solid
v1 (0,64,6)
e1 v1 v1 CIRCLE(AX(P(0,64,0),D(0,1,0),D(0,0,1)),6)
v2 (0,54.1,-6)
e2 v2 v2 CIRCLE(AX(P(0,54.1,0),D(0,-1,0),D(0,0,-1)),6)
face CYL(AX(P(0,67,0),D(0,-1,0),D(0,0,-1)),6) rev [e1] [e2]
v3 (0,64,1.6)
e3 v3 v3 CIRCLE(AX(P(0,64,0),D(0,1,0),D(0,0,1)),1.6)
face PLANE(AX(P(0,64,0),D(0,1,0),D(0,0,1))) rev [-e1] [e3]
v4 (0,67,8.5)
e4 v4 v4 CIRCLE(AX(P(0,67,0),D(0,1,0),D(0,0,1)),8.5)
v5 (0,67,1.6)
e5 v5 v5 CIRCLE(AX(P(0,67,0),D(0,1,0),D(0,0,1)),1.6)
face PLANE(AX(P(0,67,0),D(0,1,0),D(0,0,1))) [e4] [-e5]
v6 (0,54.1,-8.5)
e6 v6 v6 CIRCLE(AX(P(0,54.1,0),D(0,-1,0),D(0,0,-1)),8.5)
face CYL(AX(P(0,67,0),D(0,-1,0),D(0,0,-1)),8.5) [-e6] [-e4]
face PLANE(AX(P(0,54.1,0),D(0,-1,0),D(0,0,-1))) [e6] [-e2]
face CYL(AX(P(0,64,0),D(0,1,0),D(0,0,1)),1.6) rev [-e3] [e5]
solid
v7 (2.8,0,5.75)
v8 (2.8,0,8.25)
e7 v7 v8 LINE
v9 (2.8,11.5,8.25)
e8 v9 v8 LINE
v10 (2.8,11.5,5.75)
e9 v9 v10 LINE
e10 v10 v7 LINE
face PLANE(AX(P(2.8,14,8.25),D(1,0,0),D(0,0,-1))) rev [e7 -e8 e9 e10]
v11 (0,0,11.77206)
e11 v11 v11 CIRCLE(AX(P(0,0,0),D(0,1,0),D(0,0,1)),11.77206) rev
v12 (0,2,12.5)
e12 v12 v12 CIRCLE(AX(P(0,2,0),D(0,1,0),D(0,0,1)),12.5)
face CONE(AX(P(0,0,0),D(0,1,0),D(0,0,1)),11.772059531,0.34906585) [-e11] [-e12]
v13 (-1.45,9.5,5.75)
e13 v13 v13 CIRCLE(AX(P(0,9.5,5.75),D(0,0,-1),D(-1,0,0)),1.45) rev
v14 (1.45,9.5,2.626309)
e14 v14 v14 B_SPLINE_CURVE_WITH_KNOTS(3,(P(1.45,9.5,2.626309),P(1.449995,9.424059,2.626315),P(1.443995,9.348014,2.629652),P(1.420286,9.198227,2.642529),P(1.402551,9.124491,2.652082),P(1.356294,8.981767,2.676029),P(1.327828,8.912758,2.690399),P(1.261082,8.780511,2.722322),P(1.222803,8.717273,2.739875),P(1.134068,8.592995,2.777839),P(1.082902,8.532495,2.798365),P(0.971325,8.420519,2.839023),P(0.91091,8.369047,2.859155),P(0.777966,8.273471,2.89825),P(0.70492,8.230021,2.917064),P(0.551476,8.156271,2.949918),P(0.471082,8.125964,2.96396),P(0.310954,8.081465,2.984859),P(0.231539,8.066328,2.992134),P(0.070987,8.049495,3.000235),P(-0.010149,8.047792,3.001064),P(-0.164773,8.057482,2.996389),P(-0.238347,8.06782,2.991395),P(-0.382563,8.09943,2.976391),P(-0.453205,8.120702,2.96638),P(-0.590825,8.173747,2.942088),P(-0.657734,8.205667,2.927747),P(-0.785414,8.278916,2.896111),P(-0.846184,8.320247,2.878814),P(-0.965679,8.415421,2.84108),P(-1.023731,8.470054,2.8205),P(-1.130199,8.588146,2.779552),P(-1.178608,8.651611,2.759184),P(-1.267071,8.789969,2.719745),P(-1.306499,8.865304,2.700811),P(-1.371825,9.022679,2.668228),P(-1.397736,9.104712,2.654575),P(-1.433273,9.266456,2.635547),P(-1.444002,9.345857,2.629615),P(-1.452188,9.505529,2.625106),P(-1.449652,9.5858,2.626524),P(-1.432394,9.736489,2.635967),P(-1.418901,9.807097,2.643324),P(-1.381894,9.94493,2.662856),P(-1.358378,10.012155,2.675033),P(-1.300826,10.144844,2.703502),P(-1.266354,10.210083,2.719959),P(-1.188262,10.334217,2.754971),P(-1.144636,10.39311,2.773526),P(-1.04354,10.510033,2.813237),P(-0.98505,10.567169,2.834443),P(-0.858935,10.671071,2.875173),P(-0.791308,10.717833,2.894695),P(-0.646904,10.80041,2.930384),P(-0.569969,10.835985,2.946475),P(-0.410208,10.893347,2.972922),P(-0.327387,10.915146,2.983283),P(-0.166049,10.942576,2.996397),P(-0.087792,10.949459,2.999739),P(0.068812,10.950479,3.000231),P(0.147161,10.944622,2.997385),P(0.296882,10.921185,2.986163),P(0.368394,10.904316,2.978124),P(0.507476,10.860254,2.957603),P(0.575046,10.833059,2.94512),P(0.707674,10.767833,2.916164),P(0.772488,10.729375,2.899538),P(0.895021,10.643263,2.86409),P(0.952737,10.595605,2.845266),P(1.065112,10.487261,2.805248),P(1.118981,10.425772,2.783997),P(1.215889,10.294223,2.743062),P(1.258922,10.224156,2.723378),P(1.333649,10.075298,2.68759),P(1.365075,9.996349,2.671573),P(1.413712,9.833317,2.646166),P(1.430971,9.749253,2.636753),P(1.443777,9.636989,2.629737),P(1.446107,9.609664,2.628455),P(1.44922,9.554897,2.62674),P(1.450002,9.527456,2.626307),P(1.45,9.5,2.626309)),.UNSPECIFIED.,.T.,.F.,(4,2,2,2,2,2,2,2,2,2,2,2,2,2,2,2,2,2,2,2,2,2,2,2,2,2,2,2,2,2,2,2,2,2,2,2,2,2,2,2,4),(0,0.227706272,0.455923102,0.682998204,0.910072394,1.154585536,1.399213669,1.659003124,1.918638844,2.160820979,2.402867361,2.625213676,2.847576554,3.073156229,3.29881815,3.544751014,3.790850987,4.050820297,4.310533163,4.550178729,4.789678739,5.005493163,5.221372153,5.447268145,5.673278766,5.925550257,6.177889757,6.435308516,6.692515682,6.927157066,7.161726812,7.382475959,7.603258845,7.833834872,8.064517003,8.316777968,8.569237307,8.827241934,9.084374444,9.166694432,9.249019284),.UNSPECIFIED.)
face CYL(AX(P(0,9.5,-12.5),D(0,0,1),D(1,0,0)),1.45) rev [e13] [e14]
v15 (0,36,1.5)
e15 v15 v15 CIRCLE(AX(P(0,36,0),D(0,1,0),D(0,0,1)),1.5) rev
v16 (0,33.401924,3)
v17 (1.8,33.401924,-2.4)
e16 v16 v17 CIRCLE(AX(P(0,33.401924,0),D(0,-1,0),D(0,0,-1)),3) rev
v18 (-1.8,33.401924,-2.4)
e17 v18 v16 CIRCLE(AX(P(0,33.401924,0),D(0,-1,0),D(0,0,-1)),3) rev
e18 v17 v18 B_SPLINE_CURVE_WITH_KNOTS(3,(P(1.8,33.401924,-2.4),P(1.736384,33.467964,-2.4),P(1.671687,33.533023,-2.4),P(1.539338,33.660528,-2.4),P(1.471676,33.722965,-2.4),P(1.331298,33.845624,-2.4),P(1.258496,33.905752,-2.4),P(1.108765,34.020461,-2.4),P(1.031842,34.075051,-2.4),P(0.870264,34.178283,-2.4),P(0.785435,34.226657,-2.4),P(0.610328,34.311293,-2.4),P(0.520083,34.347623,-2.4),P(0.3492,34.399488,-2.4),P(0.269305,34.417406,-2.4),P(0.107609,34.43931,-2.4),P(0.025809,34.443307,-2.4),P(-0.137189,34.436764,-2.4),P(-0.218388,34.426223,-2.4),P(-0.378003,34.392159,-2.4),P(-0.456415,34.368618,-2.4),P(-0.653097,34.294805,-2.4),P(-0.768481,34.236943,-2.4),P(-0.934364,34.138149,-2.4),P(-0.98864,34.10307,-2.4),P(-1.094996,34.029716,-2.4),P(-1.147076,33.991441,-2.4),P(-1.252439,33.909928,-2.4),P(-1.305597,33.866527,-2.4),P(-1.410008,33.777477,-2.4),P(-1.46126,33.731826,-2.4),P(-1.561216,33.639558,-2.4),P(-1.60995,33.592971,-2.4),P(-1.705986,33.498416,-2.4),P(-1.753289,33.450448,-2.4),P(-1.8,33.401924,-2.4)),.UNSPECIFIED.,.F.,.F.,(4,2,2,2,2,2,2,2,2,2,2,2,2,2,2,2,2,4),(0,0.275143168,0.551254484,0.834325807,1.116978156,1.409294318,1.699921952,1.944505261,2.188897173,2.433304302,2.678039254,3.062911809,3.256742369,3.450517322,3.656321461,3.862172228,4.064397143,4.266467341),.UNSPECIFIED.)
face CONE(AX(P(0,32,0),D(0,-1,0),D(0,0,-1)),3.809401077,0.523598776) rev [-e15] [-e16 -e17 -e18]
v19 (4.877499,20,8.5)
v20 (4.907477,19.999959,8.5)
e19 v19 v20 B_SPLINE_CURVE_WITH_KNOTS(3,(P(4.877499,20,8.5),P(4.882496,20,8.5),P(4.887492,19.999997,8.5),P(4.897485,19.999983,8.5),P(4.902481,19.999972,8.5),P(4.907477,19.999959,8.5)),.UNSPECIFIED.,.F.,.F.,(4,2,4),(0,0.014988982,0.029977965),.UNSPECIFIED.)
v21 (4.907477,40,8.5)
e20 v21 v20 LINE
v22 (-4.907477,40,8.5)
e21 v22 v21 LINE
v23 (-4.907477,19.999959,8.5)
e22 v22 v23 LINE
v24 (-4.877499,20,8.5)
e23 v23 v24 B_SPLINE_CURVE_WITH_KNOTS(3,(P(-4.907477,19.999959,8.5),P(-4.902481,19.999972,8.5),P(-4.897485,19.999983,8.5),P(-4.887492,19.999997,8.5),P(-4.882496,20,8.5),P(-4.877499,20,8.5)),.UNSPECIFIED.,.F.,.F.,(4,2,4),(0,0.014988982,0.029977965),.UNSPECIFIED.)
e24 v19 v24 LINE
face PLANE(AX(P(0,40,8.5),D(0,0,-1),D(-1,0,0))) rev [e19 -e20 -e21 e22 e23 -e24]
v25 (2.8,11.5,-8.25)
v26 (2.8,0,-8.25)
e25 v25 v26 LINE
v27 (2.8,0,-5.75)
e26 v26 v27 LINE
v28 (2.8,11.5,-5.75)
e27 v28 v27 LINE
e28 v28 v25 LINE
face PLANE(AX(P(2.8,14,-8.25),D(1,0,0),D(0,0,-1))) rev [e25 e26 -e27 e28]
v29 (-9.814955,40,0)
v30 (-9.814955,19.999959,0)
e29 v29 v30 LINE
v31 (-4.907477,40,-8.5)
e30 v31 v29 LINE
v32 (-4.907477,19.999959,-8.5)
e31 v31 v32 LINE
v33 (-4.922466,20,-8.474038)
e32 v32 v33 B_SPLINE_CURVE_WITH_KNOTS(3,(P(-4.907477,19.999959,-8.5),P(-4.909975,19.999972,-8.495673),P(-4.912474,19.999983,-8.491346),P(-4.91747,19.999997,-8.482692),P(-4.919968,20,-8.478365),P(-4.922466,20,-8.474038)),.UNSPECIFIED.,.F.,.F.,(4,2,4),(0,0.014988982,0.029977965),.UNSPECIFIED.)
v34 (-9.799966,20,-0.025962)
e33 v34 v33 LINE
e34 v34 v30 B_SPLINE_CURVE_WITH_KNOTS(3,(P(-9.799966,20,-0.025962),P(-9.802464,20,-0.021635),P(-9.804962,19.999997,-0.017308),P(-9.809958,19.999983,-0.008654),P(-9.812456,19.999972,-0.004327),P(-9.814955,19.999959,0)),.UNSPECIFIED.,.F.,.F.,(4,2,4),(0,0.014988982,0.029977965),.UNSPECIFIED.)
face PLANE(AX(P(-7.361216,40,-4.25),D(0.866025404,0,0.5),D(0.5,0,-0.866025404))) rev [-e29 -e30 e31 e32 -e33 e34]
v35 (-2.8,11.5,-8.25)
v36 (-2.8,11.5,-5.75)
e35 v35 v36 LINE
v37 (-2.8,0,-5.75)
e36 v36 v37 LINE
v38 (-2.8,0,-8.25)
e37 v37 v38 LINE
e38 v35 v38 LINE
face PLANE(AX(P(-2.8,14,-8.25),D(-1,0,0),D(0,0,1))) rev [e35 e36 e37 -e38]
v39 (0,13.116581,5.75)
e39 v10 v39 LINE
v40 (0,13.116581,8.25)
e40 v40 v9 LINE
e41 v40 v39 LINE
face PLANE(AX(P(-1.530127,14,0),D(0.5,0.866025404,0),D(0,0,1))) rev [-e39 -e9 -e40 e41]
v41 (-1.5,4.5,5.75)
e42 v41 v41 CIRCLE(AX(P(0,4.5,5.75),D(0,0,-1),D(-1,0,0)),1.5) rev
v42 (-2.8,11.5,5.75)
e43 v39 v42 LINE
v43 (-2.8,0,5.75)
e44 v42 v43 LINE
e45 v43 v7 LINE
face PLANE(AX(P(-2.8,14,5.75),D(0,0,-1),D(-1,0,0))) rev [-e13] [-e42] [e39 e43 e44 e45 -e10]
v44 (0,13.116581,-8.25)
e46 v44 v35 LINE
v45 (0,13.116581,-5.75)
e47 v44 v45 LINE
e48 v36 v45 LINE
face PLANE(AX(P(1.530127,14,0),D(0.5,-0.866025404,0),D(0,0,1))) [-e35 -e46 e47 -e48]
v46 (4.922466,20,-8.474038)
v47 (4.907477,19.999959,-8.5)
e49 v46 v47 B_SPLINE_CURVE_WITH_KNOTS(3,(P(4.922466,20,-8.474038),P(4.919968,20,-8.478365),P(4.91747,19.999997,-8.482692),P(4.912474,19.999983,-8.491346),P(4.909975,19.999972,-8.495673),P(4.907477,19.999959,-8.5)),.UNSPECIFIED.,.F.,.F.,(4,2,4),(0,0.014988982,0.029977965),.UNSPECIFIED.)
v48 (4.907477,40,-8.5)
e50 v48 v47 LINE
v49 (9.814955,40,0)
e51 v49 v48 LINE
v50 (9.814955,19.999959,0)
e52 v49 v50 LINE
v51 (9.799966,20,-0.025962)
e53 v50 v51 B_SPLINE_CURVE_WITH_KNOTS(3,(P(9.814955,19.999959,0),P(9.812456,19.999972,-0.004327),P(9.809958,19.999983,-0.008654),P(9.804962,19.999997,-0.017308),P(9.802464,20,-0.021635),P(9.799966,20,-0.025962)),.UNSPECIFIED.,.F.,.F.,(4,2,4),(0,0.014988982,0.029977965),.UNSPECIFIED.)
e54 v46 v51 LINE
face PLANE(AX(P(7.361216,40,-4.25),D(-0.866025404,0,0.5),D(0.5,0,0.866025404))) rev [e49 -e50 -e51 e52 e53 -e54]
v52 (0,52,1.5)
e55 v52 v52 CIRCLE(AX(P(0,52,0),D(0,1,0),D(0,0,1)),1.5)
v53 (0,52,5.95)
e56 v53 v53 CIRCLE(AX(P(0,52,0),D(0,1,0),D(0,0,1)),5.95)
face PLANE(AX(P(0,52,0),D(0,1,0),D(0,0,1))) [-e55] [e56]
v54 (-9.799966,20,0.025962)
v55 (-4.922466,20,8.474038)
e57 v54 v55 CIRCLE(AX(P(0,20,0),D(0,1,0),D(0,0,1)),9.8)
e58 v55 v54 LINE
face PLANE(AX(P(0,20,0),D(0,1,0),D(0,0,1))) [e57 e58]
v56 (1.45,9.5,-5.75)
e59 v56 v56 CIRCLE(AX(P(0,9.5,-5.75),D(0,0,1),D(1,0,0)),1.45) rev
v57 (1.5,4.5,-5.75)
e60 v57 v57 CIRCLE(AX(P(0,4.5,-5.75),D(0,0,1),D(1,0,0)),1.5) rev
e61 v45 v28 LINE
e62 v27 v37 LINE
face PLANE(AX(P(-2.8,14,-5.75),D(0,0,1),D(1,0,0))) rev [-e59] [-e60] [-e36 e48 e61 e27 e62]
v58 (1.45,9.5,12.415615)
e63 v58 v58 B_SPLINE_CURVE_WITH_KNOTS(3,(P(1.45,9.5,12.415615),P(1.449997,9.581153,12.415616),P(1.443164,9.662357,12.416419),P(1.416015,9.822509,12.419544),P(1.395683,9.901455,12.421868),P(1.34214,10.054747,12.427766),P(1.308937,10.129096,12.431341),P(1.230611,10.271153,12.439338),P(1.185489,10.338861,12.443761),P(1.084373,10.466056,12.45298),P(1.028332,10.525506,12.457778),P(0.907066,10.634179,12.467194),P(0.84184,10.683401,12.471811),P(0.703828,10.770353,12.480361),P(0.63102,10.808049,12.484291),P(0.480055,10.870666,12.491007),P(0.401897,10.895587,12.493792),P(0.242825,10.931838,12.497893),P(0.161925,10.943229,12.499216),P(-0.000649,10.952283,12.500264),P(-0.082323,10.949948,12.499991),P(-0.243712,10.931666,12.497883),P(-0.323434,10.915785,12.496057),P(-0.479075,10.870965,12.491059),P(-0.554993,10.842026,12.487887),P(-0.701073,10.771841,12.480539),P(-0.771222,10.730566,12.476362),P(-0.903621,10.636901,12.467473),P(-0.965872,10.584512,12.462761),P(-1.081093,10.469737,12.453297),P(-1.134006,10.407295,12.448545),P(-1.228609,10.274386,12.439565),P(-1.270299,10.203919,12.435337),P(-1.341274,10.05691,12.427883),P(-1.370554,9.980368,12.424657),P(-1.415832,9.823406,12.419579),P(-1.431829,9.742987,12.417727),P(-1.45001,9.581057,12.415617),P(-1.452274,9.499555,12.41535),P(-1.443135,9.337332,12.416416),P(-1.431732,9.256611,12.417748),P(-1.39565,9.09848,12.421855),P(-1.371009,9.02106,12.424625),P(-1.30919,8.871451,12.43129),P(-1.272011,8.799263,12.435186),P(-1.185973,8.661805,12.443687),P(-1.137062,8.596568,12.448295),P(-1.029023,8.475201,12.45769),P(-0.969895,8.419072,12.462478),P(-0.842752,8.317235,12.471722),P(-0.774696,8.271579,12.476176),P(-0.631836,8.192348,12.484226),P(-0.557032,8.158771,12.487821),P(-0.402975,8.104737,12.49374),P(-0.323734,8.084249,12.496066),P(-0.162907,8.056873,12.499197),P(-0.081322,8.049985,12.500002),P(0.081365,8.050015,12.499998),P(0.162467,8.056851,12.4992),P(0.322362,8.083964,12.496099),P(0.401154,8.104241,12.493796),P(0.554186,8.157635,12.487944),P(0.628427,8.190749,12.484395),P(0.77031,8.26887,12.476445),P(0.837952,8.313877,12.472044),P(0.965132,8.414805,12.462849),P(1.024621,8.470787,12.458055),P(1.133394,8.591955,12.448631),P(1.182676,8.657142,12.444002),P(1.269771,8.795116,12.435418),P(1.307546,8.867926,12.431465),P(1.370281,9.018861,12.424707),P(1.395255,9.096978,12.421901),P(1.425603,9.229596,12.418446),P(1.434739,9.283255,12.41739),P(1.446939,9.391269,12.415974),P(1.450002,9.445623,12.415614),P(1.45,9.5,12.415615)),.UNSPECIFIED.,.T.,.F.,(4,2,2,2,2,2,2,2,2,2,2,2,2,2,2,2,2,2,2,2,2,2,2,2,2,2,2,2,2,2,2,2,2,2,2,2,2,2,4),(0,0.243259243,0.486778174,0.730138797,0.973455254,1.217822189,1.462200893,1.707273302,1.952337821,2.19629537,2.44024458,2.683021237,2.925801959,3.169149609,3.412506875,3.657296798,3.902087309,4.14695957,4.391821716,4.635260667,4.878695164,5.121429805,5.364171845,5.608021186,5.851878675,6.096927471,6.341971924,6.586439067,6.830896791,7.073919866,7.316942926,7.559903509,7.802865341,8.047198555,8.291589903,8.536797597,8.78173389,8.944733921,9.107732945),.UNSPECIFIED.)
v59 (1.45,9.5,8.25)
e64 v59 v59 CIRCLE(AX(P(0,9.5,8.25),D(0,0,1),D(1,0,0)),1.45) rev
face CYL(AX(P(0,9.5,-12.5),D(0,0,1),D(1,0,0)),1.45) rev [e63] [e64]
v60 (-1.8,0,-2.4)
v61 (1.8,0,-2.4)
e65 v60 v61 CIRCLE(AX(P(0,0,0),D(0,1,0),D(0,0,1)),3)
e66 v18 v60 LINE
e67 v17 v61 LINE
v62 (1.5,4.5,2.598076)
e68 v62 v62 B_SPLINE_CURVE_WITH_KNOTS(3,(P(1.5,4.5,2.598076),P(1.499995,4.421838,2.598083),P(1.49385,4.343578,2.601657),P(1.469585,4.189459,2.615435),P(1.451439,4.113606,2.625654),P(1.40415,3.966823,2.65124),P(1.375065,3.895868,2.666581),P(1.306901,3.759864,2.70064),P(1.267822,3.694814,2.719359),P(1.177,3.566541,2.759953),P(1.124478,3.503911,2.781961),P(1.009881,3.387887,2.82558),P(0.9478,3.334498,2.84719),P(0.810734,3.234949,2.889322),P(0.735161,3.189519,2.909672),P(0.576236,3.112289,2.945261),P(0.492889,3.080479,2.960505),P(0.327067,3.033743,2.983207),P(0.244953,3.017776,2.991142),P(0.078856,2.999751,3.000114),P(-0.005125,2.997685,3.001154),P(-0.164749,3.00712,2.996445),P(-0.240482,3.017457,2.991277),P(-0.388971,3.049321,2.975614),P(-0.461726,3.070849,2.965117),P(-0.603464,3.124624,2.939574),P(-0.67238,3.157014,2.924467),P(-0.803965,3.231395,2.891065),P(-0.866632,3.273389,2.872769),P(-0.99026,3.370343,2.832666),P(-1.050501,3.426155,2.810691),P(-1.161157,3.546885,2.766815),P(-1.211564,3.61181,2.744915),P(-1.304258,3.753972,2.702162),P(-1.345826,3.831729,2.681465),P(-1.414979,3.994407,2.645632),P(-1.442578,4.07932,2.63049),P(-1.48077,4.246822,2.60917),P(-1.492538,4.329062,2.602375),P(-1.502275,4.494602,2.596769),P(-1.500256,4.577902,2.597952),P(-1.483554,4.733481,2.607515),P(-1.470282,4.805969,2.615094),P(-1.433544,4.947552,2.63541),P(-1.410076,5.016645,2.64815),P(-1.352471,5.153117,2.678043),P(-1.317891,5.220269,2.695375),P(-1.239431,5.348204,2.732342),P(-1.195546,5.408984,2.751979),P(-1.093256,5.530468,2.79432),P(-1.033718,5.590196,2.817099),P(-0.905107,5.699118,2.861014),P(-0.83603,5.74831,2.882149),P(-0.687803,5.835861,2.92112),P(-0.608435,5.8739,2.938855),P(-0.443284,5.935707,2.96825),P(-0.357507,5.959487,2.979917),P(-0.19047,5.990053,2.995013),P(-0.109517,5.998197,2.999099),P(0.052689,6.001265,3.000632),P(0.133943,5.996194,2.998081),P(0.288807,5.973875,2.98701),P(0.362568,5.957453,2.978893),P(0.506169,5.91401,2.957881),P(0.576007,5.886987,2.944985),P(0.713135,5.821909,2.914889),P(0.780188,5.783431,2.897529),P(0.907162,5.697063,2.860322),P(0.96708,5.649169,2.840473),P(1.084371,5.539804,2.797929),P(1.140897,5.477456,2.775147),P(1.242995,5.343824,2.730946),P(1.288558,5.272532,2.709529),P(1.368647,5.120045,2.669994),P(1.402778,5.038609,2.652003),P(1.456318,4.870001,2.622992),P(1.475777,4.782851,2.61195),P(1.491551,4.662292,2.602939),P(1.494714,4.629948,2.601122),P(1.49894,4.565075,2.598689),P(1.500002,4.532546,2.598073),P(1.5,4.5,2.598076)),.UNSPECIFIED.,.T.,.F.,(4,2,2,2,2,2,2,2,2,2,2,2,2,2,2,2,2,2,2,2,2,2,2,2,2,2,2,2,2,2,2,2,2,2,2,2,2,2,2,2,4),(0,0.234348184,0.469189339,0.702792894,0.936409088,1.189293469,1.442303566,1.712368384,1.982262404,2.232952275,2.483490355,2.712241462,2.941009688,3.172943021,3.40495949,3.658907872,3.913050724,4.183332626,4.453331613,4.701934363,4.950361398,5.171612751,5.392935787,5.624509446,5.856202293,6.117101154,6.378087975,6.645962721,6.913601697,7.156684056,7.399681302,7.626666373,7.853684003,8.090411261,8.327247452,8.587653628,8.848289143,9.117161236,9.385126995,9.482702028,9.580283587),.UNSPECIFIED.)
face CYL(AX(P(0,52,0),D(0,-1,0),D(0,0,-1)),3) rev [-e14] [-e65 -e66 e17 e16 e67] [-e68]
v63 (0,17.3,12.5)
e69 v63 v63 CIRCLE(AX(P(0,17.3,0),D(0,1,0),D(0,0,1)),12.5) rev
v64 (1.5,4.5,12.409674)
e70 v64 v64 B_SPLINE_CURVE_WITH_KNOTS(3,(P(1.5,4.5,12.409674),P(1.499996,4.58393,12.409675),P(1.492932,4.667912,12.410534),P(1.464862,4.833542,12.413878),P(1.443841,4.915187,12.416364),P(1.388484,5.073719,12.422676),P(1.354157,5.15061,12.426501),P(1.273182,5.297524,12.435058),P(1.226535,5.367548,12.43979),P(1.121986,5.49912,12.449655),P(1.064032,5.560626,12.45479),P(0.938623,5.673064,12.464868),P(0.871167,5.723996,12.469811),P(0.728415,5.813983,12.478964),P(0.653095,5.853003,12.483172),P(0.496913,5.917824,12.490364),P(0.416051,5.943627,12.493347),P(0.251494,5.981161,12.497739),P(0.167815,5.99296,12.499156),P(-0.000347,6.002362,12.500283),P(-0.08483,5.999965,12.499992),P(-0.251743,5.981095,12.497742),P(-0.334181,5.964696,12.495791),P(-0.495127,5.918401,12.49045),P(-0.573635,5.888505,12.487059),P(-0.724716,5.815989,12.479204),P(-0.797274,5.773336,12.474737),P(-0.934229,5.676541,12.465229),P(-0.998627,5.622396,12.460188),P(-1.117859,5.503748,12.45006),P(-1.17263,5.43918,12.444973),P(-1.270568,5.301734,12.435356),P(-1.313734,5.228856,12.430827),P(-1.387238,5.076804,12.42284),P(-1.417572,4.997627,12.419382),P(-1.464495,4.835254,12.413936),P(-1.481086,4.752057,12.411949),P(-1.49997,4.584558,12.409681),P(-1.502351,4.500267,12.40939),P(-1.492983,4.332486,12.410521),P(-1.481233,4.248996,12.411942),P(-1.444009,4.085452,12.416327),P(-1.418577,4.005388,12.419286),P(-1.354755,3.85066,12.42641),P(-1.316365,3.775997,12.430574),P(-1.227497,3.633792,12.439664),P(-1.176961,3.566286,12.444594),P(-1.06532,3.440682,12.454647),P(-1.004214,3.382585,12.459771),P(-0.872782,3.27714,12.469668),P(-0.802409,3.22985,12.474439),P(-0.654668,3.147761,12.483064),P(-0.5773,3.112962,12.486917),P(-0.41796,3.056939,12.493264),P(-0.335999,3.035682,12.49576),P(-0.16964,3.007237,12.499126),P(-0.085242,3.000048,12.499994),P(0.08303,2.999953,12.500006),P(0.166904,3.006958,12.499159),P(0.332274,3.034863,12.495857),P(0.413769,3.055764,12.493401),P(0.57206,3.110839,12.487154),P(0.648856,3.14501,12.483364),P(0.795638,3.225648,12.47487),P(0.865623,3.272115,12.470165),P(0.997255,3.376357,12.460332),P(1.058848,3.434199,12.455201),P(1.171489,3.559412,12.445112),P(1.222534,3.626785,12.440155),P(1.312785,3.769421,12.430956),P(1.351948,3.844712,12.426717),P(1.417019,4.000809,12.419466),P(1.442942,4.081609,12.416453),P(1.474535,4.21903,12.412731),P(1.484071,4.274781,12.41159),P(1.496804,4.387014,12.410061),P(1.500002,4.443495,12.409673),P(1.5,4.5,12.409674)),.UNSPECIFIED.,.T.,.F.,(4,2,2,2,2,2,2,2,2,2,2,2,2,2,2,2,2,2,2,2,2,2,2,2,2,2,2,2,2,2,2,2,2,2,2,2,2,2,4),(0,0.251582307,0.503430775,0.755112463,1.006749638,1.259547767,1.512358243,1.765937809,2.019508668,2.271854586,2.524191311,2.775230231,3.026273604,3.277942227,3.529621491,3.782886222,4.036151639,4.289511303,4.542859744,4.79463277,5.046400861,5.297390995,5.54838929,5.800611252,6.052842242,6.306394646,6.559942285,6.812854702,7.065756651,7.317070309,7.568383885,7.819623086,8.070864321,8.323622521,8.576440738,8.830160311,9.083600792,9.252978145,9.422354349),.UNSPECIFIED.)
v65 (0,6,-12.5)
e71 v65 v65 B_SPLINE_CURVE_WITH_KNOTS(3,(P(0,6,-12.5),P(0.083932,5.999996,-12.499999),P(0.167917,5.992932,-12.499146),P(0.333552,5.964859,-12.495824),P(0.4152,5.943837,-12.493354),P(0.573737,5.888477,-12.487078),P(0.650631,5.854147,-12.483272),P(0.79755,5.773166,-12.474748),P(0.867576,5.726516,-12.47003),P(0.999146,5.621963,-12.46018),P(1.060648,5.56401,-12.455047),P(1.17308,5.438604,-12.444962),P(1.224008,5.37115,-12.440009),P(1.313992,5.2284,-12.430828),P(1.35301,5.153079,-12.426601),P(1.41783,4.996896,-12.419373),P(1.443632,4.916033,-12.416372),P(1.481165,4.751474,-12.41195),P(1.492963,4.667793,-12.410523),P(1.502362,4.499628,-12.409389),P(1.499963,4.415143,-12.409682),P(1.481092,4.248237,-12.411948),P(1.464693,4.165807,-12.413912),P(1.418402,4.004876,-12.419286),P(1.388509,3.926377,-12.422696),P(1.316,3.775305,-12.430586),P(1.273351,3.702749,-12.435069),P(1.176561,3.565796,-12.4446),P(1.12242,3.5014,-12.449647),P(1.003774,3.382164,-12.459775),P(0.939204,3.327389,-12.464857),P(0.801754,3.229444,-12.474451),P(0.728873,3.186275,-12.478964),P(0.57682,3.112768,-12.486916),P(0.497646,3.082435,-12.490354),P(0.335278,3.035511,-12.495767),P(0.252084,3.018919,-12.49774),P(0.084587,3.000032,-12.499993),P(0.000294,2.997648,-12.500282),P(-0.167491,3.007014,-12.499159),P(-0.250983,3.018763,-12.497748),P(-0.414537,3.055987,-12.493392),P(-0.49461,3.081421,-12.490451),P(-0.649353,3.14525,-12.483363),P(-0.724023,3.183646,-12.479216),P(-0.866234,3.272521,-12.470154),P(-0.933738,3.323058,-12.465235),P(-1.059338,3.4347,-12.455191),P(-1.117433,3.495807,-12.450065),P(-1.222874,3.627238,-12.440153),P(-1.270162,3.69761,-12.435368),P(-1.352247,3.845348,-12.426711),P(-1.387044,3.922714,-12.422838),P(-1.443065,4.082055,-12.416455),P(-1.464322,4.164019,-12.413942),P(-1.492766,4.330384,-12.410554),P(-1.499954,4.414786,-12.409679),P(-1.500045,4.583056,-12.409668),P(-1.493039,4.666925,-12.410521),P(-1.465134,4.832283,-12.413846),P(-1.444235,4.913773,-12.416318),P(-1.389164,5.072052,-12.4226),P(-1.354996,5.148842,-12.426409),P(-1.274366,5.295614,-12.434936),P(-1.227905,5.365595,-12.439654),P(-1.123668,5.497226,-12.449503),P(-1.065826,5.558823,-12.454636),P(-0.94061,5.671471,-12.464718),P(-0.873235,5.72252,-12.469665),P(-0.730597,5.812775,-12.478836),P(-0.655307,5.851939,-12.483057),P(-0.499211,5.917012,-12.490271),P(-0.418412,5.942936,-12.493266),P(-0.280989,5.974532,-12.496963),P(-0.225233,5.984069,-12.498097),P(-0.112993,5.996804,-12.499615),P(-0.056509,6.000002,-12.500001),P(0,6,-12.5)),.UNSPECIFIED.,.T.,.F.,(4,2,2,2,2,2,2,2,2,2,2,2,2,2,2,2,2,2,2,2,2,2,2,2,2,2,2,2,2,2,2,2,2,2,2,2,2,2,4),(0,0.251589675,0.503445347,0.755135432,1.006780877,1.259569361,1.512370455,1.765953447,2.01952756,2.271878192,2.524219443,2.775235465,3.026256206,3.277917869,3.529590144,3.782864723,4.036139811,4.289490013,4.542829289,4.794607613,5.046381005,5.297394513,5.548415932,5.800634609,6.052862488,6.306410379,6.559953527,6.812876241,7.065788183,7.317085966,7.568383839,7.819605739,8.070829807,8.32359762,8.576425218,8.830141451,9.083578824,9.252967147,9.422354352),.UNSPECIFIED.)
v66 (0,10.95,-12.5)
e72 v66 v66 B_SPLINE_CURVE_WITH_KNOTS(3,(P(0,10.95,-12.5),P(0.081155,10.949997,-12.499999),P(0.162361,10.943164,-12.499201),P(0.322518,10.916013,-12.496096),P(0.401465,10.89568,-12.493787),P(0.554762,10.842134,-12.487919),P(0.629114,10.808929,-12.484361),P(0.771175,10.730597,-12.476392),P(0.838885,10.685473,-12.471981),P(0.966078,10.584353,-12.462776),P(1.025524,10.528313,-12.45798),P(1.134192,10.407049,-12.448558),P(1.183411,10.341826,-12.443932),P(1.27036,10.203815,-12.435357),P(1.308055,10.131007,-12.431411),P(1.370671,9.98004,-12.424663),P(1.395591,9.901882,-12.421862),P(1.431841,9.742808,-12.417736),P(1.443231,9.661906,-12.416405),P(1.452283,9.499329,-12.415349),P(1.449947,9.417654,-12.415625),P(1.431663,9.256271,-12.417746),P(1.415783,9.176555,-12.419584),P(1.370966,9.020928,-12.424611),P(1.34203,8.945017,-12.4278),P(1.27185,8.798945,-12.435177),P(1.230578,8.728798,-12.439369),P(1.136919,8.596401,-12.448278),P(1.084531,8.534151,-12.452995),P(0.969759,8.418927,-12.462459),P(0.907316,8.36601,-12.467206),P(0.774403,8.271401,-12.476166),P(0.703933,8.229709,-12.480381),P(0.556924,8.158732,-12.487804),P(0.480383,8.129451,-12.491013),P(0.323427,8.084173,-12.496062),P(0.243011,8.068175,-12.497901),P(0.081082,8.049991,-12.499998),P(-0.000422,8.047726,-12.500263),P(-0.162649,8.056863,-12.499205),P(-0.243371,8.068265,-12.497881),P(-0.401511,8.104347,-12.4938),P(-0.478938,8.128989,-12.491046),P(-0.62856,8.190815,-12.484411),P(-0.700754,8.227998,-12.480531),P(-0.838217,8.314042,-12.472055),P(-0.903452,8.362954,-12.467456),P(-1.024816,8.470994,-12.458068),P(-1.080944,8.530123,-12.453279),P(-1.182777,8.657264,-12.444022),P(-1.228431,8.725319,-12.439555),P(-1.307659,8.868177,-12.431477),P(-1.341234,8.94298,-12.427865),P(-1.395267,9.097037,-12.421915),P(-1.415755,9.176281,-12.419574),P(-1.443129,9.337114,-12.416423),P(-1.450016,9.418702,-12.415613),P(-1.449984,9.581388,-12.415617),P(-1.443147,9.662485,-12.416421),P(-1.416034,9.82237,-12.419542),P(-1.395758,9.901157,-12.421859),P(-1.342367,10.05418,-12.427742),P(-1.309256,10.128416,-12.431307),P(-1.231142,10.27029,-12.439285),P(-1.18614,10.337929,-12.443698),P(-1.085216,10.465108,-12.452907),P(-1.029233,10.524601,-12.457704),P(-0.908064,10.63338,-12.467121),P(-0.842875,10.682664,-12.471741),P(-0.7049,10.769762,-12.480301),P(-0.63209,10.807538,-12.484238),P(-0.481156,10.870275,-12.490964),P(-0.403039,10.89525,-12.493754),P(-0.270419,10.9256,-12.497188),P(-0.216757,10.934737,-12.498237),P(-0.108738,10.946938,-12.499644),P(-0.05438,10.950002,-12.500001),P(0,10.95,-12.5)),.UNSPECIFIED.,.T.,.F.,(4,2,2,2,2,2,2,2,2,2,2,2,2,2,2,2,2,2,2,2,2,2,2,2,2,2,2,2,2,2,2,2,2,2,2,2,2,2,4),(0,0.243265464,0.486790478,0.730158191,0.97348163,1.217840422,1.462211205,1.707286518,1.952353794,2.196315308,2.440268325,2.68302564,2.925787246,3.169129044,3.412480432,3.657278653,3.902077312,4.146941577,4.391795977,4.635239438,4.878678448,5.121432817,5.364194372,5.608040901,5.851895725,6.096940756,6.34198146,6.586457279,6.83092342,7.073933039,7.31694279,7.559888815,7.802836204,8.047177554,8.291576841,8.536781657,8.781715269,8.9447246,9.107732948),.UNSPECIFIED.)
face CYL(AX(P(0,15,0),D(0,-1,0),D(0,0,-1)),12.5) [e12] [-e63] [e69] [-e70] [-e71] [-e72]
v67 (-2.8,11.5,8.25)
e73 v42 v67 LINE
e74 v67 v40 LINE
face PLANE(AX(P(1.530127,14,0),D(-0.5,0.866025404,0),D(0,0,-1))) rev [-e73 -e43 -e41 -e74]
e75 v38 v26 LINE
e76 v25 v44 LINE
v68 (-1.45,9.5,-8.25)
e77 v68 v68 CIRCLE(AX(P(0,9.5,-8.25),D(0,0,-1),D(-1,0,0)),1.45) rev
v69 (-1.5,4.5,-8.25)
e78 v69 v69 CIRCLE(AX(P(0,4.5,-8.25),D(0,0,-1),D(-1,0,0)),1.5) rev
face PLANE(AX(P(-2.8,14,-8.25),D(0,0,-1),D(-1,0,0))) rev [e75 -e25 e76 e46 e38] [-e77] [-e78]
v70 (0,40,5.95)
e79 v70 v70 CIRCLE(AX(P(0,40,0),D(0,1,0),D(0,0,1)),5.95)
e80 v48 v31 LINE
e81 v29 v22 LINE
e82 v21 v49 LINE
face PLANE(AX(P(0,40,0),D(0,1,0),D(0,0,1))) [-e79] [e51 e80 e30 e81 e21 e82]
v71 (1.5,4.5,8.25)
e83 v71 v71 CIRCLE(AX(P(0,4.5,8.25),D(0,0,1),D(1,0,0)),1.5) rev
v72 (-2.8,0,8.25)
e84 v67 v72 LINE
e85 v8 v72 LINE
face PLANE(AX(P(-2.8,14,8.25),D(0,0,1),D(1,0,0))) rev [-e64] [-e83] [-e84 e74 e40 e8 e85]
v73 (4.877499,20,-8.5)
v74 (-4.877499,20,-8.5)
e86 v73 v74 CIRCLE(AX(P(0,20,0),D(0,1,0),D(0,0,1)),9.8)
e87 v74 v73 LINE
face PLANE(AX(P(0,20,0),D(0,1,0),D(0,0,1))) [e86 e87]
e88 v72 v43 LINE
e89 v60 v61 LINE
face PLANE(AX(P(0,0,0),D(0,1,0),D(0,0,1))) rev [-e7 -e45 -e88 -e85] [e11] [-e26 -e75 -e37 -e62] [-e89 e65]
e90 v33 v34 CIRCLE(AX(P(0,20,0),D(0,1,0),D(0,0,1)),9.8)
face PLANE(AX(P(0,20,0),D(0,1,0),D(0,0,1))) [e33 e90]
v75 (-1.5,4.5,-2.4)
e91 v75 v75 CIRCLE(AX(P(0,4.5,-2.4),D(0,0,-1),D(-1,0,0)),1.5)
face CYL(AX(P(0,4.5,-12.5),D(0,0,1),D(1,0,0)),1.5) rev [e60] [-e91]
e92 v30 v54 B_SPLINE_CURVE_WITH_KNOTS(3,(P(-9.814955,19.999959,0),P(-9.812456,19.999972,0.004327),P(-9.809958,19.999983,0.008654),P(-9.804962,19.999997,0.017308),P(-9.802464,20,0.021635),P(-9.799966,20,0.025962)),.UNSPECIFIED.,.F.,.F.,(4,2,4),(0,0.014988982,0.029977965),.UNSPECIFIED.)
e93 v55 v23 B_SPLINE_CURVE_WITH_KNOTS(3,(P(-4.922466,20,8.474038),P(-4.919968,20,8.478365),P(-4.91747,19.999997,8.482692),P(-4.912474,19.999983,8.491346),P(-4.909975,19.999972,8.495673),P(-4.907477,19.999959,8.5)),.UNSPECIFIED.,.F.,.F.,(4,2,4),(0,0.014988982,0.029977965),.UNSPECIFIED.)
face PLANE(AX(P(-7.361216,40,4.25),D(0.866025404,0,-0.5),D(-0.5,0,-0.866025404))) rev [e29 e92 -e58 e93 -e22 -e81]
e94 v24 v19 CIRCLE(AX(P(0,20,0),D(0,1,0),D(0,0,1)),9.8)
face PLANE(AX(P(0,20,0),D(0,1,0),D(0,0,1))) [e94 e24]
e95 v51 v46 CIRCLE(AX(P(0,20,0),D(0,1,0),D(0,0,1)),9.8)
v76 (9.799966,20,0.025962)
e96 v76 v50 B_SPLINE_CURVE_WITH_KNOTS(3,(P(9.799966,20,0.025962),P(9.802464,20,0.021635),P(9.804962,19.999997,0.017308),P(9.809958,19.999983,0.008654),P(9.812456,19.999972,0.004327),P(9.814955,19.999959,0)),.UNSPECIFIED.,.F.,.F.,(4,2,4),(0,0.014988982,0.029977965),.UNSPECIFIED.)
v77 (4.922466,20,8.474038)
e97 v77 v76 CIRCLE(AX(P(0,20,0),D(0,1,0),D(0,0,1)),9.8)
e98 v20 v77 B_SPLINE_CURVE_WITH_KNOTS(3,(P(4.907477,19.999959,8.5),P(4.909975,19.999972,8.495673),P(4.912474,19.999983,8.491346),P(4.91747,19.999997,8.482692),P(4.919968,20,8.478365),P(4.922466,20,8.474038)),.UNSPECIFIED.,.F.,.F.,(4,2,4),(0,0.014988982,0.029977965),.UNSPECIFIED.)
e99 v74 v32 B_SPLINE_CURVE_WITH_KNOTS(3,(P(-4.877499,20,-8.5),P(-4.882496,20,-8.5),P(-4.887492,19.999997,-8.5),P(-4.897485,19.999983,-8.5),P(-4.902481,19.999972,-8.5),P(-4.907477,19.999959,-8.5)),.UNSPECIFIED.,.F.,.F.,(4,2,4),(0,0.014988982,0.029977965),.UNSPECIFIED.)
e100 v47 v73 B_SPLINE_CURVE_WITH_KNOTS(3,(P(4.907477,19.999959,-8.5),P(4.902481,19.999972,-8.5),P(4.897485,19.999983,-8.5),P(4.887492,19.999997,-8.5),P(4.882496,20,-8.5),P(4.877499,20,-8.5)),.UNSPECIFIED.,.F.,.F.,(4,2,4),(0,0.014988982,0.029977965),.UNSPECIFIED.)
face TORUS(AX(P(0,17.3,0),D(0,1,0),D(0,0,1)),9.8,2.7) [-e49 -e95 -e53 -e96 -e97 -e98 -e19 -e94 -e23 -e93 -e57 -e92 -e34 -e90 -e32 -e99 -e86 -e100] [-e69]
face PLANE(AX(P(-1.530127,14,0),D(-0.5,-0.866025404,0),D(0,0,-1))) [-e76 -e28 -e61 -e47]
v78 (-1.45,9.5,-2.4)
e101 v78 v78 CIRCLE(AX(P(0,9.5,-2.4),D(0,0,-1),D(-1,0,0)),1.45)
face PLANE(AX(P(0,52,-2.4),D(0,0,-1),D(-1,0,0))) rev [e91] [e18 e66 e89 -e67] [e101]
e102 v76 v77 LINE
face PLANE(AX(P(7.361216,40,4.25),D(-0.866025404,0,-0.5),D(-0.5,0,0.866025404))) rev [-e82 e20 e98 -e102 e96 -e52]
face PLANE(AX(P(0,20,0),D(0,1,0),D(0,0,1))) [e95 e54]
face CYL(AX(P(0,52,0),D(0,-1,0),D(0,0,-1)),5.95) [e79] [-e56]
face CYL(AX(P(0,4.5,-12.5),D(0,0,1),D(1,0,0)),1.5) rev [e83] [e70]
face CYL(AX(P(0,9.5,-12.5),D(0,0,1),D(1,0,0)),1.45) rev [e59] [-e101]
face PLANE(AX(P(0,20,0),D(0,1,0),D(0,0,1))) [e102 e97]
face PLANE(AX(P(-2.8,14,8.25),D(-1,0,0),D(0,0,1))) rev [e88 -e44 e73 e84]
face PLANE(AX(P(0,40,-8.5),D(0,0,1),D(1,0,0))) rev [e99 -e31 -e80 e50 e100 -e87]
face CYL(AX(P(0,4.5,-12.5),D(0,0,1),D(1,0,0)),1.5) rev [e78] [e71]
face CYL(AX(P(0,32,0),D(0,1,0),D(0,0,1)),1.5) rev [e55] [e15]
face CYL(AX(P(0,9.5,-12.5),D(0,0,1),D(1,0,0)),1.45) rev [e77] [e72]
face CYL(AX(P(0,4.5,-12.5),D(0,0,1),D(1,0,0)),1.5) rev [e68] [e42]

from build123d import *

# Parameters (mm, degrees)
SKETCH1_R               = 5.95
BOSS_EXTRUDE1_DEPTH     = 40
SKETCH1_2_R             = 5.95
BOSS_EXTRUDE2_DEPTH     = 52
SKETCH2_R               = 12.5
BOSS_EXTRUDE3_DEPTH     = 15
CUT_EXTRUDE1_DEPTH      = 55.922672914
CUT_EXTRUDE1_DEPTH_BACK = 55.922672914
SKETCH3_R               = 1.45
SKETCH3_R_2             = 1.5
SKETCH5_R               = 12.5
BOSS_EXTRUDE4_DEPTH     = 5
SKETCH7_R               = 8.5
SKETCH7_R_2             = 6
BOSS_EXTRUDE5_DEPTH     = 15
SKETCH8_R               = 6
SKETCH8_R_2             = 1.6
BOSS_EXTRUDE6_DEPTH     = 3
SKETCH9_R               = 8.5
CUT_EXTRUDE4_DEPTH      = 2.1
BOSS_EXTRUDE7_START     = -20
SKETCH6_R               = 3
SKETCH6_R_2             = 1.5
BOSS_EXTRUDE7_DEPTH     = 20
CHAMFER1_SIZE           = 2.309401077
CHAMFER1_SIZE_2         = 4
FILLET1_R               = 2.7
CHAMFER2_SIZE           = 2
CHAMFER2_SIZE2          = 0.727940469
SKETCH10_W              = 5.6
SKETCH10_H              = 2.5
CUT_EXTRUDE5_DEPTH      = 14
CHAMFER3_SIZE           = 2.5
CHAMFER3_SIZE_2         = 4.330127019


with BuildPart() as part:
    # Sketch1 → Boss-Extrude1 (new body)
    with BuildSketch(Plane(origin=(0, 0, 0), x_dir=(1, 0, 0), z_dir=(0, 1, 0))):
        Polygon((-4.907477288, -8.5), (4.907477288, -8.5), (9.814954576, 0), (4.907477288, 8.5), (-4.907477288, 8.5), (-9.814954576, 0), align=None)
        with Locations(Location((0, 0, 0), (0, 0, 270))):
            Circle(SKETCH1_R, mode=Mode.SUBTRACT)
    extrude(amount=BOSS_EXTRUDE1_DEPTH)

    # Sketch1<2> → Boss-Extrude2 (add)
    with BuildSketch(Plane(origin=(0, 0, 0), x_dir=(1, 0, 0), z_dir=(0, 1, 0))):
        with Locations(Location((0, 0, 0), (0, 0, 270))):
            Circle(SKETCH1_2_R)
        with BuildLine():
            Line((-1.8, 2.4), (1.8, 2.4))
            ThreePointArc((1.8, 2.4), (0, -3), (-1.8, 2.4))
        make_face(mode=Mode.SUBTRACT)
    extrude(amount=BOSS_EXTRUDE2_DEPTH)

    # Sketch2 → Boss-Extrude3 (add)
    with BuildSketch(Plane.XZ):
        with Locations(Location((0, 0, 0), (0, 0, 270))):
            Circle(SKETCH2_R)
        Polygon((4.907477288, 8.5), (-4.907477288, 8.5), (-9.814954576, 0), (-4.907477288, -8.5), (4.907477288, -8.5), (9.814954576, 0), align=None, mode=Mode.SUBTRACT)
    extrude(amount=-BOSS_EXTRUDE3_DEPTH)

    # Sketch3 → Cut-Extrude1 (cut, two sides: drawn at the far end of the back side and taken through both)
    with BuildSketch(Plane.XY.offset(-CUT_EXTRUDE1_DEPTH_BACK)):
        with Locations((0, 9.5)):
            Circle(SKETCH3_R)
        with Locations((0, 4.5)):
            Circle(SKETCH3_R_2)
    extrude(amount=CUT_EXTRUDE1_DEPTH + CUT_EXTRUDE1_DEPTH_BACK, mode=Mode.SUBTRACT)

    # Sketch5 → Boss-Extrude4 (add)
    with BuildSketch(Plane(origin=(0, 15, 0), x_dir=(1, 0, 0), z_dir=(0, 1, 0))):
        with Locations(Location((0, 0, 0), (0, 0, 90))):
            Circle(SKETCH5_R)
        Polygon((9.814954576, 0), (4.907477288, -8.5), (-4.907477288, -8.5), (-9.814954576, 0), (-4.907477288, 8.5), (4.907477288, 8.5), align=None, mode=Mode.SUBTRACT)
    extrude(amount=BOSS_EXTRUDE4_DEPTH)

    # Sketch6 → Boss-Extrude7 (add)
    with BuildSketch(Plane(origin=(0, 52, 0), x_dir=(1, 0, 0), z_dir=(0, 1, 0)).offset(BOSS_EXTRUDE7_START)):
        Circle(SKETCH6_R)
        with Locations(Location((0, 0, 0), (0, 0, 270))):
            Circle(SKETCH6_R_2, mode=Mode.SUBTRACT)
    extrude(amount=BOSS_EXTRUDE7_DEPTH)

    # Chamfer1
    # the kernel refuses this chamfer: 4, 2.309401077 mm, written as the material it takes off along each edge
    with BuildSketch(Plane(origin=(0, 32, 0), x_dir=(0, 0, 1), z_dir=(-1, 0, 0))) as chamfer1_piece_1_section:
        Polygon((1.5 + CHAMFER1_SIZE, 0), (1.5, CHAMFER1_SIZE_2), (1.5, 0), align=None)
    chamfer1_piece_1 = revolve(axis=Axis((0, 32, 0), (0, 1, 0)), mode=Mode.PRIVATE)
    chamfer1_piece_1 = chamfer1_piece_1 & Plane(origin=(0, 34.751058085, 0), x_dir=(0.6000000000000008, 0, -0.7999999999999994), z_dir=(0, -1, 0)) * Cylinder(3, 16, mode=Mode.PRIVATE)
    chamfer1_piece_1 = split(chamfer1_piece_1, bisect_by=Plane(origin=(0, 34.751058085, -2.4), z_dir=(0, 0, 1)), keep=Keep.TOP, mode=Mode.PRIVATE)
    add(chamfer1_piece_1, mode=Mode.SUBTRACT)

    # Fillet1
    # the kernel refuses this fillet: 2.7 mm, written as the material it takes off along each edge
    with BuildSketch(Plane(origin=(0, 20, 0), x_dir=(0, 0, -1), z_dir=(1, 0, 0))) as fillet1_piece_1_section:
        with BuildLine():
            CenterArc((12.5 - FILLET1_R, -FILLET1_R), FILLET1_R, 0, 90)
            Line((12.5, -FILLET1_R), (12.5, 0))
            Line((12.5, 0), (12.5 - FILLET1_R, 0))
        make_face()
    fillet1_piece_1 = revolve(axis=Axis((0, 20, 0), (0, 1, 0)), mode=Mode.PRIVATE)
    fillet1_piece_1 = split(fillet1_piece_1, bisect_by=Plane(origin=(1.041e-06, 19.432642302, -8.5), z_dir=(0, 0, -1)), keep=Keep.TOP, mode=Mode.PRIVATE)
    add(fillet1_piece_1, mode=Mode.SUBTRACT)
    with BuildSketch(Plane(origin=(0, 20, 0), x_dir=(0, 0, -1), z_dir=(1, 0, 0))) as fillet1_piece_2_section:
        with BuildLine():
            CenterArc((12.5 - FILLET1_R, -FILLET1_R), FILLET1_R, 0, 90)
            Line((12.5, -FILLET1_R), (12.5, 0))
            Line((12.5, 0), (12.5 - FILLET1_R, 0))
        make_face()
    fillet1_piece_2 = revolve(axis=Axis((0, 20, 0), (0, 1, 0)), mode=Mode.PRIVATE)
    fillet1_piece_2 = split(fillet1_piece_2, bisect_by=Plane(origin=(-7.361214724, 19.432641737, -4.250002093), z_dir=(-0.8660254037844416, 0, -0.49999999999999484)), keep=Keep.TOP, mode=Mode.PRIVATE)
    add(fillet1_piece_2, mode=Mode.SUBTRACT)
    with BuildSketch(Plane(origin=(0, 20, 0), x_dir=(0, 0, -1), z_dir=(1, 0, 0))) as fillet1_piece_3_section:
        with BuildLine():
            CenterArc((12.5 - FILLET1_R, -FILLET1_R), FILLET1_R, 0, 90)
            Line((12.5, -FILLET1_R), (12.5, 0))
            Line((12.5, 0), (12.5 - FILLET1_R, 0))
        make_face()
    fillet1_piece_3 = revolve(axis=Axis((0, 20, 0), (0, 1, 0)), mode=Mode.PRIVATE)
    fillet1_piece_3 = split(fillet1_piece_3, bisect_by=Plane(origin=(7.361217141, 19.432641737, -4.249997907), z_dir=(0.8660254037844382, 0, -0.5000000000000011)), keep=Keep.TOP, mode=Mode.PRIVATE)
    add(fillet1_piece_3, mode=Mode.SUBTRACT)
    with BuildSketch(Plane(origin=(0, 20, 0), x_dir=(0, 0, -1), z_dir=(1, 0, 0))) as fillet1_piece_4_section:
        with BuildLine():
            CenterArc((12.5 - FILLET1_R, -FILLET1_R), FILLET1_R, 0, 90)
            Line((12.5, -FILLET1_R), (12.5, 0))
            Line((12.5, 0), (12.5 - FILLET1_R, 0))
        make_face()
    fillet1_piece_4 = revolve(axis=Axis((0, 20, 0), (0, 1, 0)), mode=Mode.PRIVATE)
    fillet1_piece_4 = split(fillet1_piece_4, bisect_by=Plane(origin=(-7.361217141, 19.432641737, 4.249997907), z_dir=(-0.8660254037844347, 0, 0.500000000000007)), keep=Keep.TOP, mode=Mode.PRIVATE)
    add(fillet1_piece_4, mode=Mode.SUBTRACT)
    with BuildSketch(Plane(origin=(0, 20, 0), x_dir=(0, 0, -1), z_dir=(1, 0, 0))) as fillet1_piece_5_section:
        with BuildLine():
            CenterArc((12.5 - FILLET1_R, -FILLET1_R), FILLET1_R, 0, 90)
            Line((12.5, -FILLET1_R), (12.5, 0))
            Line((12.5, 0), (12.5 - FILLET1_R, 0))
        make_face()
    fillet1_piece_5 = revolve(axis=Axis((0, 20, 0), (0, 1, 0)), mode=Mode.PRIVATE)
    fillet1_piece_5 = split(fillet1_piece_5, bisect_by=Plane(origin=(7.361214724, 19.432641737, 4.250002093), z_dir=(0.8660254037844416, 0, 0.49999999999999495)), keep=Keep.TOP, mode=Mode.PRIVATE)
    add(fillet1_piece_5, mode=Mode.SUBTRACT)
    with BuildSketch(Plane(origin=(0, 20, 0), x_dir=(0, 0, -1), z_dir=(1, 0, 0))) as fillet1_piece_6_section:
        with BuildLine():
            CenterArc((12.5 - FILLET1_R, -FILLET1_R), FILLET1_R, 0, 90)
            Line((12.5, -FILLET1_R), (12.5, 0))
            Line((12.5, 0), (12.5 - FILLET1_R, 0))
        make_face()
    fillet1_piece_6 = revolve(axis=Axis((0, 20, 0), (0, 1, 0)), mode=Mode.PRIVATE)
    fillet1_piece_6 = split(fillet1_piece_6, bisect_by=Plane(origin=(-2.417e-06, 19.432641737, 8.5), z_dir=(0, 0, 1)), keep=Keep.TOP, mode=Mode.PRIVATE)
    add(fillet1_piece_6, mode=Mode.SUBTRACT)

    # Chamfer2
    chamfer2_edges = [part.edges().sort_by_distance(p)[0] for p in [
        (0, 0, 12.5),
    ]]
    chamfer2_side = [part.faces().sort_by_distance(p)[0] for p in [
        (0, 7.5, 12.5),
    ]]
    chamfer(chamfer2_edges, length=CHAMFER2_SIZE, length2=CHAMFER2_SIZE2, reference=chamfer2_side[0])

    # Sketch10 → Cut-Extrude5 (cut)
    with BuildSketch(Plane.XZ):
        with Locations((0, -7)):
            Rectangle(SKETCH10_W, SKETCH10_H)
        with Locations((0, 7)):
            Rectangle(SKETCH10_W, SKETCH10_H)
    extrude(amount=-CUT_EXTRUDE5_DEPTH, mode=Mode.SUBTRACT)

    # Chamfer3
    # the kernel refuses this chamfer: 4.330127019, 2.5 mm, written as the material it adds along each edge
    with BuildSketch(Plane(origin=(-2.8, 14, -5.75), x_dir=(-0.05789386240267132, -0.9983227437537926, 0), z_dir=(0, 0, -1)), Plane(origin=(2.8, 14, -8.25), x_dir=(0.05789386240267132, -0.9983227437537926, 0), z_dir=(0, 0, 1)), Plane(origin=(2.8, 14, 5.75), x_dir=(0.05789386240267132, -0.9983227437537926, 0), z_dir=(0, 0, 1)), Plane(origin=(-2.8, 14, 8.25), x_dir=(-0.05789386240267132, -0.9983227437537926, 0), z_dir=(0, 0, -1))) as chamfer3_piece_1:
        Polygon((CHAMFER3_SIZE * 0.998322743754, -CHAMFER3_SIZE * 0.0578938624027), (-CHAMFER3_SIZE_2 * 0.0578938624016, -CHAMFER3_SIZE_2 * 0.998322743736), (0, 0), align=None)
    extrude(amount=2.5)


with BuildPart() as body_2:
    # Sketch7 → Boss-Extrude5 (new body)
    with BuildSketch(Plane(origin=(0, 52, 0), x_dir=(1, 0, 0), z_dir=(0, 1, 0))):
        with Locations(Location((0, 0, 0), (0, 0, 270))):
            Circle(SKETCH7_R)
        with Locations(Location((0, 0, 0), (0, 0, 270))):
            Circle(SKETCH7_R_2, mode=Mode.SUBTRACT)
    extrude(amount=BOSS_EXTRUDE5_DEPTH)

    # Sketch8 → Boss-Extrude6 (add)
    with BuildSketch(Plane(origin=(0, 67, 0), x_dir=(1, 0, 0), z_dir=(0, 1, 0))):
        with Locations(Location((0, 0, 0), (0, 0, 270))):
            Circle(SKETCH8_R)
        with Locations(Location((0, 0, 0), (0, 0, 270))):
            Circle(SKETCH8_R_2, mode=Mode.SUBTRACT)
    extrude(amount=-BOSS_EXTRUDE6_DEPTH)

    # Sketch9 → Cut-Extrude4 (cut)
    with BuildSketch(Plane.XZ.offset(-52)):
        with Locations(Location((0, 0, 0), (0, 0, 270))):
            Circle(SKETCH9_R)
    extrude(amount=-CUT_EXTRUDE4_DEPTH, mode=Mode.SUBTRACT)


solid = Compound([part.part, body_2.part])
